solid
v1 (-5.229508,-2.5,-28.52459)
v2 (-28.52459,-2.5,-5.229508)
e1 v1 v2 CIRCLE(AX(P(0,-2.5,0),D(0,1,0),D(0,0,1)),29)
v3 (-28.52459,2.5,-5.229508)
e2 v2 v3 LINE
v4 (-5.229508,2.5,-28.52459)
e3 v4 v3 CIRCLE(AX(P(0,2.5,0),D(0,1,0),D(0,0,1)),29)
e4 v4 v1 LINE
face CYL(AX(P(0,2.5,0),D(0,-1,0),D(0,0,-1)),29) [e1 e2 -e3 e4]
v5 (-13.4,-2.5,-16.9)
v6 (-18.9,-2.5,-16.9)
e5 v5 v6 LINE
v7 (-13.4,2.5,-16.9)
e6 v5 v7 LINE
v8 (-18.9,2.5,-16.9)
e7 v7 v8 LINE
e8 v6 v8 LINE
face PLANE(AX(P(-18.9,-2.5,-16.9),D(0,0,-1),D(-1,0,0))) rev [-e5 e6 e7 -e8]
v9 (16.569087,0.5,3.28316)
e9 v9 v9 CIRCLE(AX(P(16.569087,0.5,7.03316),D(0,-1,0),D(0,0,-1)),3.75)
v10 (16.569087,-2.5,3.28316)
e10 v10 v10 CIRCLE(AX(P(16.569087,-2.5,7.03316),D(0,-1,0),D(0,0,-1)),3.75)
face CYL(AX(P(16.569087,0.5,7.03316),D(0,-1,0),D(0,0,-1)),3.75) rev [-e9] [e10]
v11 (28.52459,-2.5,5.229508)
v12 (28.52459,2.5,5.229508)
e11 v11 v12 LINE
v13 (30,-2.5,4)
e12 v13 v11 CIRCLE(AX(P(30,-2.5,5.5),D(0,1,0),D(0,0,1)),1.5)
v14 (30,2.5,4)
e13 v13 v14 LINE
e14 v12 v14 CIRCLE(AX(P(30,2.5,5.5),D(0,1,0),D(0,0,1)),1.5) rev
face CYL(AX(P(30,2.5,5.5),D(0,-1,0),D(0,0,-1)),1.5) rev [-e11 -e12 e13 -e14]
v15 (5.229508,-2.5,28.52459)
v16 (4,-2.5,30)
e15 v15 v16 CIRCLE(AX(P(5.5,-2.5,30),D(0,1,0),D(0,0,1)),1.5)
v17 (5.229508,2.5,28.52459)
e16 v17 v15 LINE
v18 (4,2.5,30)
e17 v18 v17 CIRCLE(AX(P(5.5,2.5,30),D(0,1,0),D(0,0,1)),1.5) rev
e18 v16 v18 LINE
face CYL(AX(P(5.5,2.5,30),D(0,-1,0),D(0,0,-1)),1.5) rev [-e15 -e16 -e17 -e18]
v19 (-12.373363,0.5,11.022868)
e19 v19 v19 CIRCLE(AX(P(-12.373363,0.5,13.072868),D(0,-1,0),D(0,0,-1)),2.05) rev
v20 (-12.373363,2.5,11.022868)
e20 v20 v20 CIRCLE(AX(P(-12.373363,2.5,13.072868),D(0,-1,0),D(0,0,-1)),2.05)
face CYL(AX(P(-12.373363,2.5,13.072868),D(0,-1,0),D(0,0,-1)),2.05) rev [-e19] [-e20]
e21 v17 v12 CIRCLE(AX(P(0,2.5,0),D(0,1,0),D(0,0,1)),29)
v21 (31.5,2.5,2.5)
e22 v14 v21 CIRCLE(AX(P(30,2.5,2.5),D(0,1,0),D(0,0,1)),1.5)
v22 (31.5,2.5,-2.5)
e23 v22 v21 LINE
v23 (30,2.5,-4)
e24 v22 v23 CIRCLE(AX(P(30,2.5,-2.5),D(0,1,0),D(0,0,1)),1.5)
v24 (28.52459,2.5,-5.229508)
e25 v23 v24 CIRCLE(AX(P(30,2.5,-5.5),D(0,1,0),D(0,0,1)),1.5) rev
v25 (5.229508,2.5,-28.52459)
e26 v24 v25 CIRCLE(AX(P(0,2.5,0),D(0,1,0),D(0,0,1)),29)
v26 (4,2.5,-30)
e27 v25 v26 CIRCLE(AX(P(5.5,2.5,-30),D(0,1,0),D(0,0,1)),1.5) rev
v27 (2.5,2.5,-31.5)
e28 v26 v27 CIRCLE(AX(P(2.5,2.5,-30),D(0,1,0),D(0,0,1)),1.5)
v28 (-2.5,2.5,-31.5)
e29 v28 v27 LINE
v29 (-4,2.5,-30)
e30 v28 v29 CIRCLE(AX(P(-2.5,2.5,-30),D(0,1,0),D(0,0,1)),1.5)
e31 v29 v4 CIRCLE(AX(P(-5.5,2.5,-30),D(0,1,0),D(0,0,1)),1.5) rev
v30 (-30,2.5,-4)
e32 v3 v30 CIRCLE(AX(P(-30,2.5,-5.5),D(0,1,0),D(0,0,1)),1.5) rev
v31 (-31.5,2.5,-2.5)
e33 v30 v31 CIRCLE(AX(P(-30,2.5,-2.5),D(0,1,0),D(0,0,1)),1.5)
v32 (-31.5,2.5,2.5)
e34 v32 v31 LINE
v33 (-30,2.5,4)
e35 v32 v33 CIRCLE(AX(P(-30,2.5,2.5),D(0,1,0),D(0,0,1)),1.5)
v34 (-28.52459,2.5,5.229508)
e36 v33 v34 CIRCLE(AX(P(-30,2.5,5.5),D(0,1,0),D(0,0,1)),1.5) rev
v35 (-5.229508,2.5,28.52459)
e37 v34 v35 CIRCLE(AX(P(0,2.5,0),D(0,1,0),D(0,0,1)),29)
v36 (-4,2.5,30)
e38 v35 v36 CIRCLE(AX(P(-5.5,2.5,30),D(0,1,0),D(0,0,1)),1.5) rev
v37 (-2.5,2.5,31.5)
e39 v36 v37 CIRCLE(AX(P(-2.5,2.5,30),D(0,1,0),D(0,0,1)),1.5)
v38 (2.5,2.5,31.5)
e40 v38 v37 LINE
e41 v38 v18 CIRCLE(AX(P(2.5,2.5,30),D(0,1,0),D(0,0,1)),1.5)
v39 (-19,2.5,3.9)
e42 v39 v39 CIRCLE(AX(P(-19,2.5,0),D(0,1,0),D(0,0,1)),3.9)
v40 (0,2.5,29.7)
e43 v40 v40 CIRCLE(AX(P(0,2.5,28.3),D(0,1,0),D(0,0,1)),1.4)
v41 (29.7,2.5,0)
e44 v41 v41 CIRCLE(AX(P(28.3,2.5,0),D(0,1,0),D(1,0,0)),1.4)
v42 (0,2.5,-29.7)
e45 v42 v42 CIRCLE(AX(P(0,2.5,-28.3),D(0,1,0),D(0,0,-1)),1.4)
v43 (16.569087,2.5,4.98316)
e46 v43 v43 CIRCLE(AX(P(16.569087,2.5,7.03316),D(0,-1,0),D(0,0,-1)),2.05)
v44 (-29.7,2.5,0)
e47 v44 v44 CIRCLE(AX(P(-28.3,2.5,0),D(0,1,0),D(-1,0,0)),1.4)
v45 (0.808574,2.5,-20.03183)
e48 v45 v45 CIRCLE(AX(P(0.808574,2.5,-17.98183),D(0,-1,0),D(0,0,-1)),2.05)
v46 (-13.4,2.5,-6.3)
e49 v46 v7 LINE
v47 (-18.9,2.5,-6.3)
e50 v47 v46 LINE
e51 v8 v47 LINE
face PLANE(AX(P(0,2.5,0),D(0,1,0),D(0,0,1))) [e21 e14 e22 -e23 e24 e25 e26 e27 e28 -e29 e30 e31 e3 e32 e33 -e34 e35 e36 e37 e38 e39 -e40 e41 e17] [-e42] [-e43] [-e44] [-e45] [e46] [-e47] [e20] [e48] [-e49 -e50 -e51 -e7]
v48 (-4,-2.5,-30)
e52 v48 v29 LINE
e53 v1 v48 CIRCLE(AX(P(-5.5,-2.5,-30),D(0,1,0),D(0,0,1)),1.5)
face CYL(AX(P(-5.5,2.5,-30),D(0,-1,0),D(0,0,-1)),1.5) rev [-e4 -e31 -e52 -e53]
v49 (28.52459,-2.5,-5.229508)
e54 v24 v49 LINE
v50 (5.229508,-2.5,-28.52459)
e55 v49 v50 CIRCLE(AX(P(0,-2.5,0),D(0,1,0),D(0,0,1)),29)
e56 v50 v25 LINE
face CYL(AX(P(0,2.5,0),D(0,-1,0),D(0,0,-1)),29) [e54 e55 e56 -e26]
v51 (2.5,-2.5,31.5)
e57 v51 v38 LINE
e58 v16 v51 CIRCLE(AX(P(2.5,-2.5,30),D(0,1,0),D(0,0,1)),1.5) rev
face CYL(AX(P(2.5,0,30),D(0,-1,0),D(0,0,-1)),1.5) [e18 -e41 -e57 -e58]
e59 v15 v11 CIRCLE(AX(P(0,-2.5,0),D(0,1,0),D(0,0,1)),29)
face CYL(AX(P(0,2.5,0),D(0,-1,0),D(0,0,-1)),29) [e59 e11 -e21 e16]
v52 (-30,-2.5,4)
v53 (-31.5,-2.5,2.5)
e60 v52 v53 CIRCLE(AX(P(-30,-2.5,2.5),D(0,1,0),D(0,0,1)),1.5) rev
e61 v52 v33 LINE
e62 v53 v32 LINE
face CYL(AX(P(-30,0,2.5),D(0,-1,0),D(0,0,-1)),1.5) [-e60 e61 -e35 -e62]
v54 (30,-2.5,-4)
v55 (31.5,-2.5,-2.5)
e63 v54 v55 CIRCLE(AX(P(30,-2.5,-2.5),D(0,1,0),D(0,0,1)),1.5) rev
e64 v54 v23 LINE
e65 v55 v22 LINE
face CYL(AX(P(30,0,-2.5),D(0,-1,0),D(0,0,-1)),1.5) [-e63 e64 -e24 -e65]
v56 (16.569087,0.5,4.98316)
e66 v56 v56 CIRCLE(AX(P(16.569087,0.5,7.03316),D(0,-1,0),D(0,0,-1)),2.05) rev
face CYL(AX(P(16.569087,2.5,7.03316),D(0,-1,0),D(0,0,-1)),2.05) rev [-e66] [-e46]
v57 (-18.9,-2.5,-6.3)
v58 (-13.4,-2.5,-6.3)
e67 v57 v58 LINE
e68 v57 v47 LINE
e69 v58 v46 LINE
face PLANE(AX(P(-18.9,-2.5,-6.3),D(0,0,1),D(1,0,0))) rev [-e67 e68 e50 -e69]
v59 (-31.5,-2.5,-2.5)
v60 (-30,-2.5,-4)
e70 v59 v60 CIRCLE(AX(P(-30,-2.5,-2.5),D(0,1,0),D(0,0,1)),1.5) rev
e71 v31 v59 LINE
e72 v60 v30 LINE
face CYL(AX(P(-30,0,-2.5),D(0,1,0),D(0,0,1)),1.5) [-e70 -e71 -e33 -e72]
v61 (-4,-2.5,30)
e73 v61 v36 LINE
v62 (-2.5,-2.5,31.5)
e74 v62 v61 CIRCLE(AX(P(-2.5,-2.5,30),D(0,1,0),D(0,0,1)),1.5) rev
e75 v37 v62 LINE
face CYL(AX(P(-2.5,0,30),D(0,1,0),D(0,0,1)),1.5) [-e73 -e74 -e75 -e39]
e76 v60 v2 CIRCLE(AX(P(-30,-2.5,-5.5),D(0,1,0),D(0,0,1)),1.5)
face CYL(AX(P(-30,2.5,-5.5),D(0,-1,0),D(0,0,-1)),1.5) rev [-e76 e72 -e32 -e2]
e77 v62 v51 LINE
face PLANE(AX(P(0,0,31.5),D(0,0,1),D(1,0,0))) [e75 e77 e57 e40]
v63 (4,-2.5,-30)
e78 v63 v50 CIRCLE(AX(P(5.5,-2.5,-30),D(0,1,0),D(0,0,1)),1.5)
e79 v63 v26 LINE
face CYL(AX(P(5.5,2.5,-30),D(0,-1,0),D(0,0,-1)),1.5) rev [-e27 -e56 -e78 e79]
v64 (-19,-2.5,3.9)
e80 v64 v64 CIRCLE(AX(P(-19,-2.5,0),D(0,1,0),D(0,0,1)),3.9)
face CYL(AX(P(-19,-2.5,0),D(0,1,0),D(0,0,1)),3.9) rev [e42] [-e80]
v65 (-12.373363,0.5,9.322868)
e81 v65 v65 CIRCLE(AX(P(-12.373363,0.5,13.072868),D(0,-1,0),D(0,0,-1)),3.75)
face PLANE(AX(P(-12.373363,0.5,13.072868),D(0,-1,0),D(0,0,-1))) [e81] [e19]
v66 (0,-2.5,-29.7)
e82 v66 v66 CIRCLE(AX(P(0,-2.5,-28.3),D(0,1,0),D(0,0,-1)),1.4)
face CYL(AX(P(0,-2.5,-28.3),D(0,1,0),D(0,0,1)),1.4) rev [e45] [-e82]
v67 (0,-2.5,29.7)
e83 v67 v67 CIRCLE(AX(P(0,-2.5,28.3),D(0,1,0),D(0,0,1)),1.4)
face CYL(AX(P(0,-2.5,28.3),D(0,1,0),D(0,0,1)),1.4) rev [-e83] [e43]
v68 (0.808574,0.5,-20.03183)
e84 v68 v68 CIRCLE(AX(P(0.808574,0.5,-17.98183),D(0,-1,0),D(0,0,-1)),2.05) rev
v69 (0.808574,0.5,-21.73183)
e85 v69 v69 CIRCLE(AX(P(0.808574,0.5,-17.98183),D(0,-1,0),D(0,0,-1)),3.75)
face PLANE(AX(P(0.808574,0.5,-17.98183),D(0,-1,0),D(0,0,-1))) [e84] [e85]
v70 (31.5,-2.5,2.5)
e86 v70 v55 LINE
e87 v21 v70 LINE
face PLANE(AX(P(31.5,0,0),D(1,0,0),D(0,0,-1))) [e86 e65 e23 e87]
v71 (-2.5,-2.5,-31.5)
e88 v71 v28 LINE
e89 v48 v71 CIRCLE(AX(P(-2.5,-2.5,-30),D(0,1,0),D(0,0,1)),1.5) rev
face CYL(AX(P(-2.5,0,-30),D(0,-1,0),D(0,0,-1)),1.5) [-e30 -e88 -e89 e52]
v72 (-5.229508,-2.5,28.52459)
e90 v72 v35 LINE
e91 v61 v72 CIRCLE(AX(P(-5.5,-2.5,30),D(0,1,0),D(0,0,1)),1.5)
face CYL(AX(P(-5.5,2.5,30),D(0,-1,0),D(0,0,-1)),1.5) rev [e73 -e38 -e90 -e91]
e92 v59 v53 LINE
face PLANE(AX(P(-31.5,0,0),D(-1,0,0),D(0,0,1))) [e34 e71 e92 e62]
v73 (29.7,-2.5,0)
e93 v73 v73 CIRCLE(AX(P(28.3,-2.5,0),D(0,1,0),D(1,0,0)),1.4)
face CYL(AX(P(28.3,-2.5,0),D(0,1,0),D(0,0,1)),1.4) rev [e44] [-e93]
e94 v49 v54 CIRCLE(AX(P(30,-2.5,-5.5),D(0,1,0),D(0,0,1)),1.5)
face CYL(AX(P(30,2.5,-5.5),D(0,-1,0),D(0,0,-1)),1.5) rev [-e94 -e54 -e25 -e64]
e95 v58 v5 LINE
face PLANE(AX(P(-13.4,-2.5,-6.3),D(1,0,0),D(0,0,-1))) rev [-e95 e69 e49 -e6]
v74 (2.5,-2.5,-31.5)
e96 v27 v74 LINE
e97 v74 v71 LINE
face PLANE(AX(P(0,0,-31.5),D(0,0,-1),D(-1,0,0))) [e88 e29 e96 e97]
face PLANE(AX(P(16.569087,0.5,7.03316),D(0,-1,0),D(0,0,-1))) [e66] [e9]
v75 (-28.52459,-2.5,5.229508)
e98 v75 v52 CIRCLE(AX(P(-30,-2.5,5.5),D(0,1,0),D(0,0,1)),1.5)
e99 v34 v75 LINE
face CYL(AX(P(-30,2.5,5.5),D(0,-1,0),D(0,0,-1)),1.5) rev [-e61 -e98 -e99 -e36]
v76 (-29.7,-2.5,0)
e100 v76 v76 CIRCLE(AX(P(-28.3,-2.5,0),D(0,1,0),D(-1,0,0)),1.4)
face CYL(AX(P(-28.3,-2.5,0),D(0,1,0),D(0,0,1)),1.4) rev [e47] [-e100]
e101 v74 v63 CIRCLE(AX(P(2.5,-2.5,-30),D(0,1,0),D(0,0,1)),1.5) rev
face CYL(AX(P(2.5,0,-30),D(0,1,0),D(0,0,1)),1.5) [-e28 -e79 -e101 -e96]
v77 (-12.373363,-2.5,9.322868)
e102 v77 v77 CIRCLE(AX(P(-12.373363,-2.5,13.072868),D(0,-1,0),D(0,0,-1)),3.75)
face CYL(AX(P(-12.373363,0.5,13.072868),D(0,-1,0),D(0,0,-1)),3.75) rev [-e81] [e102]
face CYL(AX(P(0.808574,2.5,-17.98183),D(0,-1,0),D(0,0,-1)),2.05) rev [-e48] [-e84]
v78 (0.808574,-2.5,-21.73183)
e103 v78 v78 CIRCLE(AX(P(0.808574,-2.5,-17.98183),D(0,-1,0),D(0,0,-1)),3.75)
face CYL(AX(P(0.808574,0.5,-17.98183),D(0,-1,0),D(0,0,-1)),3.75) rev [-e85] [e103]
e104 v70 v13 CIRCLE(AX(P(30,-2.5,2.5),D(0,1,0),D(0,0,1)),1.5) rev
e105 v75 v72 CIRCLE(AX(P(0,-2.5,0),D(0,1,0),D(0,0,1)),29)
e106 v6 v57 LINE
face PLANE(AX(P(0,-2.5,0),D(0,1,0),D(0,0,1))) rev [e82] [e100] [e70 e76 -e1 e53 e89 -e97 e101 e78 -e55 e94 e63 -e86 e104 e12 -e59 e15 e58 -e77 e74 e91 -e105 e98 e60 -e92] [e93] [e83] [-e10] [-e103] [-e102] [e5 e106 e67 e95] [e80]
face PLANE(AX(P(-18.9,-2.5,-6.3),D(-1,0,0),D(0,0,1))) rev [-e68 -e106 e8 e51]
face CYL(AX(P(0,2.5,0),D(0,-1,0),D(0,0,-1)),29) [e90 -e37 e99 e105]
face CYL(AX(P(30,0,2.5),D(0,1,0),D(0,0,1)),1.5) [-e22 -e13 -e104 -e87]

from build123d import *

# Parameters (mm, degrees)
SKETCH1_R                = 29
BOSS_EXTRUDE1_DEPTH      = 2.5
SKETCH3_W                = 8
SKETCH3_H                = 5
BOSS_EXTRUDE2_DEPTH      = 31.5
SKETCH5_R                = 1.4
CUT_EXTRUDE1_DEPTH       = 44.107423955
FILLET2_R                = 1.5
CIRPATTERN1_COUNT        = 4
FILLET2_OF_CIRPATTERN1_R = 1.5
SKETCH6_R                = 3.9
CUT_EXTRUDE2_DEPTH       = 45.827446949
SKETCH7_W                = 5.5
SKETCH7_H                = 10.6
CUT_EXTRUDE3_DEPTH       = 45.827446949
SKETCH8_R                = 2.05
CUT_EXTRUDE4_DEPTH       = 45.827446949
SKETCH9_R                = 3.75
CUT_EXTRUDE5_DEPTH       = 3


with BuildPart() as part:
    # Sketch1 → Boss-Extrude1 (new, symmetric)
    with BuildSketch(Plane(origin=(0, 0, 0), x_dir=(1, 0, 0), z_dir=(0, 1, 0))):
        with Locations(Location((0, 0, 0), (0, 0, 270))):
            Circle(SKETCH1_R)
    extrude(amount=BOSS_EXTRUDE1_DEPTH, both=True)

    # Sketch3 → Boss-Extrude2 (add)
    with BuildSketch(Plane.XY):
        Rectangle(SKETCH3_W, SKETCH3_H)
    boss_extrude2 = extrude(amount=BOSS_EXTRUDE2_DEPTH)

    # Sketch5 → Cut-Extrude1 (cut, through all)
    with BuildSketch(Plane(origin=(0, 2.5, 0), x_dir=(1, 0, 0), z_dir=(0, 1, 0))):
        with Locations(Location((0, -28.3, 0), (0, 0, 270))):
            Circle(SKETCH5_R)
    cut_extrude1 = extrude(amount=-CUT_EXTRUDE1_DEPTH, mode=Mode.SUBTRACT)

    # Fillet2
    fillet2_edges = [part.edges().sort_by_distance(p)[0] for p in [
        (4, 0, 28.722813233),
        (-4, 0, 28.722813233),
        (-4, 0, 31.5),
        (4, 0, 31.5),
    ]]
    fillet(fillet2_edges, radius=FILLET2_R - 0.0001)  # a hair under: the kernel refuses the full size

    # CirPattern1: Boss-Extrude2, Cut-Extrude1 ×4 about axis
    cirpattern1_axis = Axis((0, 0, 0), (0, 1, 0))
    add([boss_extrude2.rotate(cirpattern1_axis, i * 360 / CIRPATTERN1_COUNT) for i in range(1, CIRPATTERN1_COUNT)])
    add([cut_extrude1.rotate(cirpattern1_axis, i * 360 / CIRPATTERN1_COUNT) for i in range(1, CIRPATTERN1_COUNT)], mode=Mode.SUBTRACT)

    # Fillet2 of CirPattern1
    fillet2_of_cirpattern1_edges = [part.edges().sort_by_distance(p)[0] for p in [
        (28.722813233, 0, -4),
        (28.722813233, 0, 4),
        (31.5, 0, 4),
        (31.5, 0, -4),
        (-4, 0, -28.722813233),
        (4, 0, -28.722813233),
        (4, 0, -31.5),
        (-4, 0, -31.5),
        (-28.722813233, 0, 4),
        (-28.722813233, 0, -4),
        (-31.5, 0, -4),
        (-31.5, 0, 4),
    ]]
    fillet(fillet2_of_cirpattern1_edges, radius=FILLET2_OF_CIRPATTERN1_R - 0.0001)  # a hair under: the kernel refuses the full size

    # Sketch6 → Cut-Extrude2 (cut, through all)
    with BuildSketch(Plane(origin=(0, 2.5, 0), x_dir=(1, 0, 0), z_dir=(0, 1, 0))):
        with Locations(Location((-19, 0, 0), (0, 0, 270))):
            Circle(SKETCH6_R)
    extrude(amount=-CUT_EXTRUDE2_DEPTH, mode=Mode.SUBTRACT)

    # Sketch7 → Cut-Extrude3 (cut, through all)
    with BuildSketch(Plane(origin=(0, 2.5, 0), x_dir=(1, 0, 0), z_dir=(0, 1, 0))):
        with Locations((-16.15, 11.6)):
            Rectangle(SKETCH7_W, SKETCH7_H)
    extrude(amount=-CUT_EXTRUDE3_DEPTH, mode=Mode.SUBTRACT)

    # Sketch8 → Cut-Extrude4 (cut, through all)
    with BuildSketch(Plane.XZ.offset(2.5)):
        with Locations(Location((0.80857407, -17.981829939, 0), (0, 0, 270))):
            Circle(SKETCH8_R)
        with Locations(Location((16.569087362, 7.033160313, 0), (0, 0, 270))):
            Circle(SKETCH8_R)
        with Locations(Location((-12.373363213, 13.072868194, 0), (0, 0, 270))):
            Circle(SKETCH8_R)
    extrude(amount=-CUT_EXTRUDE4_DEPTH, mode=Mode.SUBTRACT)

    # Sketch9 → Cut-Extrude5 (cut)
    with BuildSketch(Plane(origin=(0, -2.5, 0), x_dir=(-1, 0, 0), z_dir=(0, -1, 0))):
        with Locations(Location((-0.80857407, 17.981829939, 0), (0, 0, 90))):
            Circle(SKETCH9_R)
        with Locations(Location((12.373363213, -13.072868194, 0), (0, 0, 90))):
            Circle(SKETCH9_R)
        with Locations(Location((-16.569087362, -7.033160313, 0), (0, 0, 90))):
            Circle(SKETCH9_R)
    extrude(amount=-CUT_EXTRUDE5_DEPTH, mode=Mode.SUBTRACT)


solid = part.part
